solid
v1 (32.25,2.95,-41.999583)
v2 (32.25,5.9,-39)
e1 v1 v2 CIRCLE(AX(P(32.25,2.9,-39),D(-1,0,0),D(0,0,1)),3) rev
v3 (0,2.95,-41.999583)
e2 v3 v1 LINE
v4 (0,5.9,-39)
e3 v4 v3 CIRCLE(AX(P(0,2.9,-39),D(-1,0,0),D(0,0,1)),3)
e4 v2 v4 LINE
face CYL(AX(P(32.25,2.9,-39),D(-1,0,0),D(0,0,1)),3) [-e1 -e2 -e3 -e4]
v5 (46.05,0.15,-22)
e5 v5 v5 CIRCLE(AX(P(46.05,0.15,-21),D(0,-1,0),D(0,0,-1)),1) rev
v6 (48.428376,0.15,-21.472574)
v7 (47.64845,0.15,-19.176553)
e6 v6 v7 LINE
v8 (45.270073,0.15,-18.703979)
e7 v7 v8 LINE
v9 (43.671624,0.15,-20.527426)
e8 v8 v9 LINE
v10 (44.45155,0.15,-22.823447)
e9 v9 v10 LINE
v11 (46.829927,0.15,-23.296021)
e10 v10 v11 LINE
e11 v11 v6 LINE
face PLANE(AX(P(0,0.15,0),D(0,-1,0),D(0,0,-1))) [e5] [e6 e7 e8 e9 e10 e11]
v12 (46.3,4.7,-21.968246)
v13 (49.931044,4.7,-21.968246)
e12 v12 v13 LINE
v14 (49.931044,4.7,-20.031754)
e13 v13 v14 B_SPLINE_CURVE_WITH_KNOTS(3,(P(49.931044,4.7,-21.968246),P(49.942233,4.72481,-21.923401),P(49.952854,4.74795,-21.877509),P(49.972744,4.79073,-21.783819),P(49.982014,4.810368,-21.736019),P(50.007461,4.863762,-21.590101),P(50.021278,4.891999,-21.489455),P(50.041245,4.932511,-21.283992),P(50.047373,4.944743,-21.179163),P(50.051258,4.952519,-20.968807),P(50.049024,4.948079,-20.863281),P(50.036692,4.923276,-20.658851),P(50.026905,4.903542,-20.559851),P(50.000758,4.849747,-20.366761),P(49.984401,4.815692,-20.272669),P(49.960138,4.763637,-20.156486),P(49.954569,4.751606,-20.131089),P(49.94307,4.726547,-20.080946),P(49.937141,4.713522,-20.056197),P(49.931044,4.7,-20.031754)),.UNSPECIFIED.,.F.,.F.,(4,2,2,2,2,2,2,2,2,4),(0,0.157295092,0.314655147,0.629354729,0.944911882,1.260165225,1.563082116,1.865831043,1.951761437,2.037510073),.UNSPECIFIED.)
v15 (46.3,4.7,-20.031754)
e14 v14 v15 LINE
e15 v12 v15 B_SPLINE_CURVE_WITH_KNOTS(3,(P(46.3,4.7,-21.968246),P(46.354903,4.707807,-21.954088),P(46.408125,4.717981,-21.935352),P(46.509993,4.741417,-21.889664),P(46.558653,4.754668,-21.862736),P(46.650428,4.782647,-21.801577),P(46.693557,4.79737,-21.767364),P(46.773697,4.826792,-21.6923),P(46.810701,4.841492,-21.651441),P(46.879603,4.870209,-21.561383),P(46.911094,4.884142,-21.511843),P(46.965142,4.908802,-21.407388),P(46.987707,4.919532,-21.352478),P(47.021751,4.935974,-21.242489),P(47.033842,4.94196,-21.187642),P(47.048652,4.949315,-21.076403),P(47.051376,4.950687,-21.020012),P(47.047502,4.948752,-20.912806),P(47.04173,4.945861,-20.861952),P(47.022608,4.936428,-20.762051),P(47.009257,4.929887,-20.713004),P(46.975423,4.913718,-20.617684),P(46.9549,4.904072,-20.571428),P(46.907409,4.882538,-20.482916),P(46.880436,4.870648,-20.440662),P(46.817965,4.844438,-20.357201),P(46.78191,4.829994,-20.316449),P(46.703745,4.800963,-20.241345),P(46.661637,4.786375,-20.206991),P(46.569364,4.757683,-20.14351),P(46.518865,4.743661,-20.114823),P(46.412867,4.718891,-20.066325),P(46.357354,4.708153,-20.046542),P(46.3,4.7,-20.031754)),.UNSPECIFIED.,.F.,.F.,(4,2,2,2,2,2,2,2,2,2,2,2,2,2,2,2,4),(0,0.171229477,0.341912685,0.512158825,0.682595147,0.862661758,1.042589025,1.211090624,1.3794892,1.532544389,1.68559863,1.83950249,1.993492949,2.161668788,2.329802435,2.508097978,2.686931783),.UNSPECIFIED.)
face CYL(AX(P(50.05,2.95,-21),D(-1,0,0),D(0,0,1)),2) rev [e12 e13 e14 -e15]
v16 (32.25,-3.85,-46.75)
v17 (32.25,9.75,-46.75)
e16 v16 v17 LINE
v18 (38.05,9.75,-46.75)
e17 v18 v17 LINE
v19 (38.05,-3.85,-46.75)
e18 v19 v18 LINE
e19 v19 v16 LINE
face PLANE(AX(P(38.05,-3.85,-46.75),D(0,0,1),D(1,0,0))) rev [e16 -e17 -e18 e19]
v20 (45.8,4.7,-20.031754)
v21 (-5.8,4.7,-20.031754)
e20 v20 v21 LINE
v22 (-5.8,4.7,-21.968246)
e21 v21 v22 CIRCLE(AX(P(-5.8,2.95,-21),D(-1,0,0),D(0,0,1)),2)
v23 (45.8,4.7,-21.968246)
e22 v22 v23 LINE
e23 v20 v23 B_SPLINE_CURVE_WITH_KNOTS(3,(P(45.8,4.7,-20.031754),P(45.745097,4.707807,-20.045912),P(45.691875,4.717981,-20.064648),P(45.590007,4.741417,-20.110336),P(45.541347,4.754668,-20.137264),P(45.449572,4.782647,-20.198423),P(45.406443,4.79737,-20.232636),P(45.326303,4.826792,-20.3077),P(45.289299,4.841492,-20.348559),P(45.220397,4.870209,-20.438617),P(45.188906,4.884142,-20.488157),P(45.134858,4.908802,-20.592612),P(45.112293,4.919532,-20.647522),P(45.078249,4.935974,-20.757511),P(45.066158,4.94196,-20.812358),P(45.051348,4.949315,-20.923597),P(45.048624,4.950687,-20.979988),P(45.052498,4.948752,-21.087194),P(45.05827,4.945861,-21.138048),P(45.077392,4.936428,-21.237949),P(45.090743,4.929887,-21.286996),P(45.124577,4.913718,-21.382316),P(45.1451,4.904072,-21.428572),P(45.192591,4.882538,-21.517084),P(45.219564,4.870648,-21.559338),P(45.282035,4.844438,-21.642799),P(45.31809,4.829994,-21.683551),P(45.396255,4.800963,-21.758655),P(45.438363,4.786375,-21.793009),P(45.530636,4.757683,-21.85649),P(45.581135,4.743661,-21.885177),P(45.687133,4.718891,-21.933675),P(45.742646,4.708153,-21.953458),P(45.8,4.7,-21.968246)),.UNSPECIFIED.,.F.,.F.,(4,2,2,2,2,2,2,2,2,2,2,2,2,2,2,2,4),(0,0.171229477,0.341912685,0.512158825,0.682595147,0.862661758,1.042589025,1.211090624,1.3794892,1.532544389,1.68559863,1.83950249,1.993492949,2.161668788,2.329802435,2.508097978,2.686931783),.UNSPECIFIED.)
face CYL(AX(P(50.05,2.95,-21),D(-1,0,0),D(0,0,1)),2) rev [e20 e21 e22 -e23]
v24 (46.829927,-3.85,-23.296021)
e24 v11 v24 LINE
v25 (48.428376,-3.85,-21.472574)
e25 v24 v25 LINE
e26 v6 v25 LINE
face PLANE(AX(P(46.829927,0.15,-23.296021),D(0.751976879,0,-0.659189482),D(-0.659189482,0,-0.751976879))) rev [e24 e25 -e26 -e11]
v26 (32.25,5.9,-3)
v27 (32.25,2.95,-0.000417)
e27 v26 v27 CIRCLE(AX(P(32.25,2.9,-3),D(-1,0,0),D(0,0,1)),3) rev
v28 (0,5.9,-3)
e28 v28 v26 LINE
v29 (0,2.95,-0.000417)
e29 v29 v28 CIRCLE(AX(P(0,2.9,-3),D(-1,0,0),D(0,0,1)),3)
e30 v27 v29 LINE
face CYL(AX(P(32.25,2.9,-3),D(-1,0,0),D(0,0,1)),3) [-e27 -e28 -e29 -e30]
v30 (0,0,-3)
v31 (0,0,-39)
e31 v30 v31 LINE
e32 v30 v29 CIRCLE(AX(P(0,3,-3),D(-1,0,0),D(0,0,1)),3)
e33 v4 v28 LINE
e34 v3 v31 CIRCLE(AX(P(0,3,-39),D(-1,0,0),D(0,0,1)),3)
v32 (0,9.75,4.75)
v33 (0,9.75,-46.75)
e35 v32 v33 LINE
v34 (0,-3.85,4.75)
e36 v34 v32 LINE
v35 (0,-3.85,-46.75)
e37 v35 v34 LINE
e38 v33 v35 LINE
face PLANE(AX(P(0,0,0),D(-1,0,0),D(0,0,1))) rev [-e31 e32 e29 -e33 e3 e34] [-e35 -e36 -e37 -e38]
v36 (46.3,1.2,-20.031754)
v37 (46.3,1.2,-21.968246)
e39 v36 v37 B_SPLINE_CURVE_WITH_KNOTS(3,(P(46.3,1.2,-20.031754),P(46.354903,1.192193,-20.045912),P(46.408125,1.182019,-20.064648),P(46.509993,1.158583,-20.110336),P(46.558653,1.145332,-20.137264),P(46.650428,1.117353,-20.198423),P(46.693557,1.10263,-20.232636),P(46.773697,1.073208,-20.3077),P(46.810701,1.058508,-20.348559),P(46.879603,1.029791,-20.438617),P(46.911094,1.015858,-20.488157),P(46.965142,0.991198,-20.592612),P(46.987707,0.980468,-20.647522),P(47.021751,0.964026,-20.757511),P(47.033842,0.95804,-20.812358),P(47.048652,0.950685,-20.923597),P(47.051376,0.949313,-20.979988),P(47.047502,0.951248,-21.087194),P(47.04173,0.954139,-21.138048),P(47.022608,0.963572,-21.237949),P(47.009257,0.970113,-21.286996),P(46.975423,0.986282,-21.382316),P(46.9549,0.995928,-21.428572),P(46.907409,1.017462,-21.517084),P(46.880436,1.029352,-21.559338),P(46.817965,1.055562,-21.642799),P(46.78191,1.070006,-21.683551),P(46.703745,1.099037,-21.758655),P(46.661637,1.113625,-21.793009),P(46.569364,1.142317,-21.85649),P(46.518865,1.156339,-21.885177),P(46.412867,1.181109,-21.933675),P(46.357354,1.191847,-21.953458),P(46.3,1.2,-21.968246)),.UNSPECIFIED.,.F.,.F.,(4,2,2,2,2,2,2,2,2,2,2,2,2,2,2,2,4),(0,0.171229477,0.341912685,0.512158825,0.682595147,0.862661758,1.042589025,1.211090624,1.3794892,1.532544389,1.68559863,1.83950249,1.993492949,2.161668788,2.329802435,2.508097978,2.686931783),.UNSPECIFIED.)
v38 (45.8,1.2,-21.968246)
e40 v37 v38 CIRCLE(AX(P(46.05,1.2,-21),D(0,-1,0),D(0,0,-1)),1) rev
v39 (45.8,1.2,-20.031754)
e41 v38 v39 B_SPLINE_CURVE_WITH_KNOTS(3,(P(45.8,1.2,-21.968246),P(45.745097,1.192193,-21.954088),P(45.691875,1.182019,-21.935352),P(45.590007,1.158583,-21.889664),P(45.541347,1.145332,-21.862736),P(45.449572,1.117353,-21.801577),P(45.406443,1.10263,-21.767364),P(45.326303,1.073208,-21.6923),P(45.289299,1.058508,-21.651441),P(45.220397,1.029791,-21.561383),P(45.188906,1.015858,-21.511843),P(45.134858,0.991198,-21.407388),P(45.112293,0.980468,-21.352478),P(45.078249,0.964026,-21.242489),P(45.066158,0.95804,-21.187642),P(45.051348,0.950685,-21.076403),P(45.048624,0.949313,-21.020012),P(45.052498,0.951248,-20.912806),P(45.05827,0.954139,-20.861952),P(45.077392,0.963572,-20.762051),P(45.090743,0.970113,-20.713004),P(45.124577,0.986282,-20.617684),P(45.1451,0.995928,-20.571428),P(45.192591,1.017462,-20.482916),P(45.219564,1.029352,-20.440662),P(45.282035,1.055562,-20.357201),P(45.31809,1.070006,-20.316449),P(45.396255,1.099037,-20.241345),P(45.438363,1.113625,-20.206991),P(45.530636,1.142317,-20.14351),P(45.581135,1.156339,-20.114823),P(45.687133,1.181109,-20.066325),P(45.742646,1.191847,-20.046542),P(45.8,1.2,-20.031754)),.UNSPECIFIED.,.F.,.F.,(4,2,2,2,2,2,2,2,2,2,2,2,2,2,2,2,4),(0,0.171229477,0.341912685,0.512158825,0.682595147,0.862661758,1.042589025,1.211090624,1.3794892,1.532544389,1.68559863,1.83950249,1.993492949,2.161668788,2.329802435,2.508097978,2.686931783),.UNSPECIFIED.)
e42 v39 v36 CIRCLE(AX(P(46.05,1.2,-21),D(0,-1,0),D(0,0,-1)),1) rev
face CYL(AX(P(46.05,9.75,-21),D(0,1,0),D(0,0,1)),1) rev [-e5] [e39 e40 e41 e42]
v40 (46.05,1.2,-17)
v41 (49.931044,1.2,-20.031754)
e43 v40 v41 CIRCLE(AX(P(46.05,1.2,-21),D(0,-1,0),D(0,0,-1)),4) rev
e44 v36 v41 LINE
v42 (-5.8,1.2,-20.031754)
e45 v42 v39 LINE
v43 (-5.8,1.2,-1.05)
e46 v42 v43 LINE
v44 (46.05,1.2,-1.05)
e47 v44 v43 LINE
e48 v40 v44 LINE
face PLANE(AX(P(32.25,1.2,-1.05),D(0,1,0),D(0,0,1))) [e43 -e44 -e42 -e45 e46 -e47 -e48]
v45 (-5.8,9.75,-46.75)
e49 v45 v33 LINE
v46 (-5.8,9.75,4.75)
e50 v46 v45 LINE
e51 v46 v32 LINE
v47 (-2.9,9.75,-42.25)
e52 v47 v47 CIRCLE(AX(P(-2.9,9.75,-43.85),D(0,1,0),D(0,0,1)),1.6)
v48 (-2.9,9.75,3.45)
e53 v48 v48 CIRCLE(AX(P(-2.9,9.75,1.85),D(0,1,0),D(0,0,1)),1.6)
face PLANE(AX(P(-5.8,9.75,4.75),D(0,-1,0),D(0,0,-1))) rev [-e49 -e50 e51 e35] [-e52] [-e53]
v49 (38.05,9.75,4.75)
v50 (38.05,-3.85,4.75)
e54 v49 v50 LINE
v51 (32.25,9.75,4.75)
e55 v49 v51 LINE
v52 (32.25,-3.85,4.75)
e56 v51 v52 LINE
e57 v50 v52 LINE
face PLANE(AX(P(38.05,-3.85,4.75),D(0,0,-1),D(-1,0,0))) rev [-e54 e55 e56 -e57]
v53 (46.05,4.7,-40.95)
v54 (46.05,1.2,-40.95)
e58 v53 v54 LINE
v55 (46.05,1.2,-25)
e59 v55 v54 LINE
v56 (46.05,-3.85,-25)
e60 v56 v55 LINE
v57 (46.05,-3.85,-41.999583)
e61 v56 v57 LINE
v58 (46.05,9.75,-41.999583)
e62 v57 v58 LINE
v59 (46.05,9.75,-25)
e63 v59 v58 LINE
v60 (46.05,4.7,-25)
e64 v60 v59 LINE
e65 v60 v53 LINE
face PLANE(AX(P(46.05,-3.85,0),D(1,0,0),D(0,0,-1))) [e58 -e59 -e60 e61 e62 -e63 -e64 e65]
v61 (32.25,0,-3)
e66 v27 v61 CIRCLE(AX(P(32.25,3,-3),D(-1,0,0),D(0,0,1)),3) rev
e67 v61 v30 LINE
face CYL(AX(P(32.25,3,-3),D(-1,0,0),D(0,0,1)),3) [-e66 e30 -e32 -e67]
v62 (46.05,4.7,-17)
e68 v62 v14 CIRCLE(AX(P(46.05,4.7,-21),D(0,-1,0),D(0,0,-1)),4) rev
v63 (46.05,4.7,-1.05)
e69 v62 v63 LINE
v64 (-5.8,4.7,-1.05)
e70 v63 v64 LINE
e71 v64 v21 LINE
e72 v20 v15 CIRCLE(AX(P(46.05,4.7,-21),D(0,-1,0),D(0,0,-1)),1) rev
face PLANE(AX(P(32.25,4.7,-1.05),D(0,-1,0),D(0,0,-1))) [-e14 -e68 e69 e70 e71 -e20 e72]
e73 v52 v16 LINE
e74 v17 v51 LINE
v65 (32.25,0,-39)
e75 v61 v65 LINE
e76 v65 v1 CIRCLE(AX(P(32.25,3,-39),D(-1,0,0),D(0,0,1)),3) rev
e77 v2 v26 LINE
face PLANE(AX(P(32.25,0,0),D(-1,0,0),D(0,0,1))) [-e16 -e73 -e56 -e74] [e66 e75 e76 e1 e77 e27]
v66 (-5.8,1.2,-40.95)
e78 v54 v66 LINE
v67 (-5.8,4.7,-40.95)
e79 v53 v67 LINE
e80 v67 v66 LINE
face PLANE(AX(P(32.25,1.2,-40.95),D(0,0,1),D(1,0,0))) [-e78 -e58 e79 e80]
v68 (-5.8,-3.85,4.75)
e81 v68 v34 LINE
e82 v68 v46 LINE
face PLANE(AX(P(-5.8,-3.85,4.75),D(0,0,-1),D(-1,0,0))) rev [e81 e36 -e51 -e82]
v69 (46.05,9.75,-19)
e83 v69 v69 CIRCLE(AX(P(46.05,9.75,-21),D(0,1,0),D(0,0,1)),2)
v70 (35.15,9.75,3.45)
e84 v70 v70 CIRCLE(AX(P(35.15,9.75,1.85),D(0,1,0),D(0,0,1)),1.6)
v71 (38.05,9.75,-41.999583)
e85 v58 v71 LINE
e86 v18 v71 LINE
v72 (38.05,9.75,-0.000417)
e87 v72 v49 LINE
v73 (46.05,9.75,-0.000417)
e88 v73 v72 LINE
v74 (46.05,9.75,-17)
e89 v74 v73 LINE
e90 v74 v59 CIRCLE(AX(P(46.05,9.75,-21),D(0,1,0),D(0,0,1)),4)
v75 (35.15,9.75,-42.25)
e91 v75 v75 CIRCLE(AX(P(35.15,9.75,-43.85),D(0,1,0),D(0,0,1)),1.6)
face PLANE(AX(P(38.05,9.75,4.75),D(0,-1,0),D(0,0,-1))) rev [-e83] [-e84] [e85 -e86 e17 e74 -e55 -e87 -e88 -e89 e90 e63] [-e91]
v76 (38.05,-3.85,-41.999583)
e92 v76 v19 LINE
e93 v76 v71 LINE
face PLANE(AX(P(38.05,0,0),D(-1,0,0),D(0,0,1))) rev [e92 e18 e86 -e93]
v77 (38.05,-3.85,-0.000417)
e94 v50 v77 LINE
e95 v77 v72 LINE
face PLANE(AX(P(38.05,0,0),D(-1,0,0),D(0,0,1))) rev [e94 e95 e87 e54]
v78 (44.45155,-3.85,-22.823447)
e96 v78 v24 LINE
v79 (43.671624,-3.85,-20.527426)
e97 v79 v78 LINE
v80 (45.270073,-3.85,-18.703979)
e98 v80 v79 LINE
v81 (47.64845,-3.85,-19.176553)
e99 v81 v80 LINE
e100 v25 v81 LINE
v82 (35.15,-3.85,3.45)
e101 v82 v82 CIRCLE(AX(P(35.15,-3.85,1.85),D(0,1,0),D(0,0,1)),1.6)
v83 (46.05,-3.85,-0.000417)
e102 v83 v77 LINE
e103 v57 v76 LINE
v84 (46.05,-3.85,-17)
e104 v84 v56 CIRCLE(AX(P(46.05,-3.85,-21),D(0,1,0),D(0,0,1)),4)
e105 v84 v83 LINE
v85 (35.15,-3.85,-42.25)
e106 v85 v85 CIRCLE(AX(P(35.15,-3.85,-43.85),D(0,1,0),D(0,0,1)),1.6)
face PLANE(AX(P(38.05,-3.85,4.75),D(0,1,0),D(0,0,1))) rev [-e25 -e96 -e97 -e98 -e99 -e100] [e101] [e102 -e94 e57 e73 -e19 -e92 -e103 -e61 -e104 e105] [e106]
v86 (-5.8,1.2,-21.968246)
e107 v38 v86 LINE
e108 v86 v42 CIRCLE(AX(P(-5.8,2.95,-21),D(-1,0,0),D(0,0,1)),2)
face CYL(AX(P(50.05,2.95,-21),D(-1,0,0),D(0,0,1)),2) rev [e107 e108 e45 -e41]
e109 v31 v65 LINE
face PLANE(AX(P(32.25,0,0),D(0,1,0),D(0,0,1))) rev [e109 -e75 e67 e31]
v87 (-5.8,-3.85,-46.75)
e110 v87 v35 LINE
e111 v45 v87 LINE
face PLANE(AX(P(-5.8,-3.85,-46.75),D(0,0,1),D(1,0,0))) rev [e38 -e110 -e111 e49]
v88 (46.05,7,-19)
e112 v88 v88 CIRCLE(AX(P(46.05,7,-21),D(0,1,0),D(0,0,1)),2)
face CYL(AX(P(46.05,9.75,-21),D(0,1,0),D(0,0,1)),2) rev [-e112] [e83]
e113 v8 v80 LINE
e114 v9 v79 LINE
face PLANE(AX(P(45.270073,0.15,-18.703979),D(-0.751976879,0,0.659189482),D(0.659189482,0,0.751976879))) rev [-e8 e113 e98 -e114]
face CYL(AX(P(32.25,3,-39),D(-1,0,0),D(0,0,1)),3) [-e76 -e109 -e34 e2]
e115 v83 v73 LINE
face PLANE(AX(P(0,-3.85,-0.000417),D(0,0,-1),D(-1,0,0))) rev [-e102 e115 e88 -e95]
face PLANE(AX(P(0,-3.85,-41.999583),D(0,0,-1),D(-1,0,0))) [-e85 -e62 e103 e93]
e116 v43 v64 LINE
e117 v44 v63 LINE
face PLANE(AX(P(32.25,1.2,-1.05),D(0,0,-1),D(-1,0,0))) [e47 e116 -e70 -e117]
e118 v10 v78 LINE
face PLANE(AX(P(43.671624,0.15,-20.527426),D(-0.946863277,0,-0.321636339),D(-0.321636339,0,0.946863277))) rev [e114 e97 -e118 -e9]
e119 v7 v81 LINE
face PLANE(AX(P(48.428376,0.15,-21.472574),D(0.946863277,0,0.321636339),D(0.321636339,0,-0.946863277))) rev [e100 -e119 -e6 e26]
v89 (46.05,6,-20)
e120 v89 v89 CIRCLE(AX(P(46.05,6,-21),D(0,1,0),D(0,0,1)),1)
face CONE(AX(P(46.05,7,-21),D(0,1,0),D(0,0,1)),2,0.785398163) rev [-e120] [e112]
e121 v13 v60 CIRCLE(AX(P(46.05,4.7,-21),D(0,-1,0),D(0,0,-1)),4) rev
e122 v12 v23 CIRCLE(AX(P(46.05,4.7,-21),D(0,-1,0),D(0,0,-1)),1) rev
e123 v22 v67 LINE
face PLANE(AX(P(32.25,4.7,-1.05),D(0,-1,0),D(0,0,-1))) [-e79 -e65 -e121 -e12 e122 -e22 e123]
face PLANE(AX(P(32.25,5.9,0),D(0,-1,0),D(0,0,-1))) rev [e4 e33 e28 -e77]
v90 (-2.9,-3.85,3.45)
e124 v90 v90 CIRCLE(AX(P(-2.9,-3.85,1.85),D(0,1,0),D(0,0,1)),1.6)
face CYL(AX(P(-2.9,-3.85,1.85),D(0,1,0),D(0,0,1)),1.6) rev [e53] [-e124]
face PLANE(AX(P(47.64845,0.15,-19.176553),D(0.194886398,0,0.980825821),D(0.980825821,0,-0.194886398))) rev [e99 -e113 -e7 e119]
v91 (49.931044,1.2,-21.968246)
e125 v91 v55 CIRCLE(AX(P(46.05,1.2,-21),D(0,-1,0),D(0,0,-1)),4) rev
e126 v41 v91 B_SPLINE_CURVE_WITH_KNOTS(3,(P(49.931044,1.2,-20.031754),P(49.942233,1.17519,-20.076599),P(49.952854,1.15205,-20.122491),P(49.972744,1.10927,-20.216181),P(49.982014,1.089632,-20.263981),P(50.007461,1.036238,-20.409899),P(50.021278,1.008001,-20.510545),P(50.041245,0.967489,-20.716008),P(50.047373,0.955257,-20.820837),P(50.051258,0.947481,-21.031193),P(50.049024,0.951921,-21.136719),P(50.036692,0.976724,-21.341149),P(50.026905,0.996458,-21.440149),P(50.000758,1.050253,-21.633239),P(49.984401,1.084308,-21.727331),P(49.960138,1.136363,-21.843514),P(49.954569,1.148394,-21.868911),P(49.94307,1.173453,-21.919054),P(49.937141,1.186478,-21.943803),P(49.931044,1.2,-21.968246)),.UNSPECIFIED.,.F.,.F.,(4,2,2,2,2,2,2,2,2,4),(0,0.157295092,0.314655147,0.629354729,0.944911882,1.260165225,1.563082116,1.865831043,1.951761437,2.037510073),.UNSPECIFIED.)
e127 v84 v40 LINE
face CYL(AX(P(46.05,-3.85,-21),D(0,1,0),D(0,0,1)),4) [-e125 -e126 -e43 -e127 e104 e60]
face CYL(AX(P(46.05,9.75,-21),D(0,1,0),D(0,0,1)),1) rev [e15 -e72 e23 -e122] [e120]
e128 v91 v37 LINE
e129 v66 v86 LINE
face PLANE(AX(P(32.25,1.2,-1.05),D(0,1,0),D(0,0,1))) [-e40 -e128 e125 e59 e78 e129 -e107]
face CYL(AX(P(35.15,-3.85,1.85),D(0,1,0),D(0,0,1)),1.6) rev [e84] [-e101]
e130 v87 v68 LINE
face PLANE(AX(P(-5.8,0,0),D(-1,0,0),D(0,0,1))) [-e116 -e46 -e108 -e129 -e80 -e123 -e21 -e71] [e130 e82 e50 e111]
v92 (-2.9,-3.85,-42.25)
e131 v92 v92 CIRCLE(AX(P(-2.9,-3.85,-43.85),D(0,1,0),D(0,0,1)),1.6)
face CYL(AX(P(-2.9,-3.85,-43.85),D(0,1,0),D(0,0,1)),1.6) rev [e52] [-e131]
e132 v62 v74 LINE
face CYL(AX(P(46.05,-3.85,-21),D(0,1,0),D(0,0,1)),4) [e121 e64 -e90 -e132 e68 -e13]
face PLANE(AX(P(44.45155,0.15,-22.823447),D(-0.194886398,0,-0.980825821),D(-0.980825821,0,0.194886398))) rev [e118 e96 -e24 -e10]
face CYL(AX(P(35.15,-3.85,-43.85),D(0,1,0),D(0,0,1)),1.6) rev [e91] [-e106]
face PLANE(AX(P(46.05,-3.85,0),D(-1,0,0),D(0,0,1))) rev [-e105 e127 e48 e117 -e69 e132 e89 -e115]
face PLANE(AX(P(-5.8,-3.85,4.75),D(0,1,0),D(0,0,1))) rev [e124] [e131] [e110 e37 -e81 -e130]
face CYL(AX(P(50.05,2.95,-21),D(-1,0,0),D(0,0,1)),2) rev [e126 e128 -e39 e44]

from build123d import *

# Parameters (mm, degrees)
SKETCH1_W           = 42
SKETCH1_H           = 5.9
SKETCH1_W_2         = 39.9
SKETCH1_H_2         = 3.5
BOSS_EXTRUDE1_DEPTH = 32.25
FILLET2_R           = 3
SKETCH2_W           = 51.5
SKETCH2_H           = 13.6
SKETCH2_W_2         = 39.9
SKETCH2_H_2         = 3.5
BOSS_EXTRUDE2_DEPTH = 5.8
SKETCH3_W           = 51.5
SKETCH3_H           = 13.6
SKETCH3_W_2         = 39.9
SKETCH3_H_2         = 3.5
BOSS_EXTRUDE3_DEPTH = 5.8
SKETCH4_R           = 1.6
CUT_EXTRUDE1_DEPTH  = 62.792596644
BOSS_EXTRUDE4_DEPTH = 13.6
CUT_EXTRUDE4_DEPTH  = 4
SKETCH15_W          = 39.9
SKETCH15_H          = 3.5
CUT_EXTRUDE5_DEPTH  = 74.483654645
SKETCH17_R          = 2
CUT_EXTRUDE6_DEPTH  = 74.483654645


with BuildPart() as part:
    # Sketch1 → Boss-Extrude1 (new body)
    with BuildSketch(Plane(origin=(0, 0, 0), x_dir=(0, 0, -1), z_dir=(1, 0, 0))):
        with Locations((21, 2.95)):
            Rectangle(SKETCH1_W, SKETCH1_H)
        with Locations((21, 2.95)):
            Rectangle(SKETCH1_W_2, SKETCH1_H_2, mode=Mode.SUBTRACT)
    extrude(amount=BOSS_EXTRUDE1_DEPTH)

    # Fillet2
    # the kernel refuses this fillet: 3 mm, written as the material it takes off along each edge
    with BuildSketch(Plane(origin=(-7.5, 0, -42), x_dir=(0, 0, 1), z_dir=(1, 0, 0)), Plane(origin=(-7.5, 5.9, 0), x_dir=(0, 0, -1), z_dir=(1, 0, 0)), Plane(origin=(-7.5, 5.9, -42), x_dir=(0, -1, 0), z_dir=(1, 0, 0))) as fillet2_piece_1:
        with BuildLine():
            CenterArc((FILLET2_R, -FILLET2_R), FILLET2_R, 90, 90)
            Line((0, -FILLET2_R), (0, 0))
            Line((0, 0), (FILLET2_R, 0))
        make_face()
    extrude(amount=47.25, mode=Mode.SUBTRACT)
    with BuildSketch(Plane(origin=(-7.5, 0, 0), x_dir=(0, 0, -1), z_dir=(1, 0, 0))) as fillet2_piece_2:
        with BuildLine():
            CenterArc((FILLET2_R, FILLET2_R), FILLET2_R, 180, 90)
            Line((0, FILLET2_R), (0, 0))
            Line((0, 0), (FILLET2_R, 0))
        make_face()
    extrude(amount=47.25, mode=Mode.SUBTRACT)

    # Sketch2 → Boss-Extrude2 (add)
    with BuildSketch(Plane(origin=(32.25, 0, 0), x_dir=(0, 0, -1), z_dir=(1, 0, 0))):
        with Locations((21, 2.95)):
            Rectangle(SKETCH2_W, SKETCH2_H)
        with Locations((21, 2.95)):
            Rectangle(SKETCH2_W_2, SKETCH2_H_2, mode=Mode.SUBTRACT)
    extrude(amount=BOSS_EXTRUDE2_DEPTH)

    # Sketch3 → Boss-Extrude3 (add)
    with BuildSketch(Plane.ZY):
        with Locations((-21, 2.95)):
            Rectangle(SKETCH3_W, SKETCH3_H)
        with Locations((-21, 2.95)):
            Rectangle(SKETCH3_W_2, SKETCH3_H_2, mode=Mode.SUBTRACT)
    extrude(amount=BOSS_EXTRUDE3_DEPTH)

    # Sketch4 → Cut-Extrude1 (cut, through all)
    with BuildSketch(Plane(origin=(0, 9.75, 0), x_dir=(1, 0, 0), z_dir=(0, 1, 0))):
        with Locations(Location((-2.9, 43.85, 0), (0, 0, 270))):
            Circle(SKETCH4_R)
        with Locations(Location((35.15, 43.85, 0), (0, 0, 270))):
            Circle(SKETCH4_R)
        with Locations(Location((-2.9, -1.85, 0), (0, 0, 270))):
            Circle(SKETCH4_R)
        with Locations(Location((35.15, -1.85, 0), (0, 0, 270))):
            Circle(SKETCH4_R)
    extrude(amount=-CUT_EXTRUDE1_DEPTH, mode=Mode.SUBTRACT)

    # Sketch8 → Boss-Extrude4 (add)
    with BuildSketch(Plane(origin=(0, 9.75, 0), x_dir=(1, 0, 0), z_dir=(0, 1, 0))):
        with BuildLine():
            ThreePointArc((46.05, 17), (50.05, 21), (46.05, 25))
            Line((46.05, 25), (46.05, 41.999583304))
            Line((46.05, 41.999583304), (38.05, 41.999583304))
            Line((38.05, 41.999583304), (38.05, 0.000416696))
            Line((38.05, 0.000416696), (46.05, 0.000416696))
            Line((46.05, 0.000416696), (46.05, 17))
        make_face()
    extrude(amount=-BOSS_EXTRUDE4_DEPTH)

    # Sketch13 → CSK for M2 Flat Head Machine Screw1 (revolve, cut)
    with BuildSketch(Plane(origin=(46.05, 9.75, -21), x_dir=(0, 0, 1), z_dir=(1, 0, 0))):
        Polygon((0, 0), (0, 13.6), (1, 13.6), (1, 3.75), (2, 2.75), (2, 0), align=None)
    revolve(axis=Axis((46.05, 16.1, -21), (0, -1, 0)), mode=Mode.SUBTRACT)

    # Sketch14 → Cut-Extrude4 (cut)
    with BuildSketch(Plane.XZ.offset(3.85)):
        Polygon((43.671623782, -20.5274256), (44.451550455, -22.823447025), (46.829926673, -23.296021425), (48.428376218, -21.4725744), (47.648449545, -19.176552975), (45.270073327, -18.703978575), align=None)
    extrude(amount=-CUT_EXTRUDE4_DEPTH, mode=Mode.SUBTRACT)

    # Sketch15 → Cut-Extrude5 (cut, through all)
    with BuildSketch(Plane.ZY.offset(5.8)):
        with Locations((-21, 2.95)):
            Rectangle(SKETCH15_W, SKETCH15_H)
    extrude(amount=-CUT_EXTRUDE5_DEPTH, mode=Mode.SUBTRACT)

    # Sketch17 → Cut-Extrude6 (cut, through all)
    with BuildSketch(Plane.ZY.offset(5.8)):
        with Locations((-21, 2.95)):
            Circle(SKETCH17_R)
    extrude(amount=-CUT_EXTRUDE6_DEPTH, mode=Mode.SUBTRACT)


solid = part.part
